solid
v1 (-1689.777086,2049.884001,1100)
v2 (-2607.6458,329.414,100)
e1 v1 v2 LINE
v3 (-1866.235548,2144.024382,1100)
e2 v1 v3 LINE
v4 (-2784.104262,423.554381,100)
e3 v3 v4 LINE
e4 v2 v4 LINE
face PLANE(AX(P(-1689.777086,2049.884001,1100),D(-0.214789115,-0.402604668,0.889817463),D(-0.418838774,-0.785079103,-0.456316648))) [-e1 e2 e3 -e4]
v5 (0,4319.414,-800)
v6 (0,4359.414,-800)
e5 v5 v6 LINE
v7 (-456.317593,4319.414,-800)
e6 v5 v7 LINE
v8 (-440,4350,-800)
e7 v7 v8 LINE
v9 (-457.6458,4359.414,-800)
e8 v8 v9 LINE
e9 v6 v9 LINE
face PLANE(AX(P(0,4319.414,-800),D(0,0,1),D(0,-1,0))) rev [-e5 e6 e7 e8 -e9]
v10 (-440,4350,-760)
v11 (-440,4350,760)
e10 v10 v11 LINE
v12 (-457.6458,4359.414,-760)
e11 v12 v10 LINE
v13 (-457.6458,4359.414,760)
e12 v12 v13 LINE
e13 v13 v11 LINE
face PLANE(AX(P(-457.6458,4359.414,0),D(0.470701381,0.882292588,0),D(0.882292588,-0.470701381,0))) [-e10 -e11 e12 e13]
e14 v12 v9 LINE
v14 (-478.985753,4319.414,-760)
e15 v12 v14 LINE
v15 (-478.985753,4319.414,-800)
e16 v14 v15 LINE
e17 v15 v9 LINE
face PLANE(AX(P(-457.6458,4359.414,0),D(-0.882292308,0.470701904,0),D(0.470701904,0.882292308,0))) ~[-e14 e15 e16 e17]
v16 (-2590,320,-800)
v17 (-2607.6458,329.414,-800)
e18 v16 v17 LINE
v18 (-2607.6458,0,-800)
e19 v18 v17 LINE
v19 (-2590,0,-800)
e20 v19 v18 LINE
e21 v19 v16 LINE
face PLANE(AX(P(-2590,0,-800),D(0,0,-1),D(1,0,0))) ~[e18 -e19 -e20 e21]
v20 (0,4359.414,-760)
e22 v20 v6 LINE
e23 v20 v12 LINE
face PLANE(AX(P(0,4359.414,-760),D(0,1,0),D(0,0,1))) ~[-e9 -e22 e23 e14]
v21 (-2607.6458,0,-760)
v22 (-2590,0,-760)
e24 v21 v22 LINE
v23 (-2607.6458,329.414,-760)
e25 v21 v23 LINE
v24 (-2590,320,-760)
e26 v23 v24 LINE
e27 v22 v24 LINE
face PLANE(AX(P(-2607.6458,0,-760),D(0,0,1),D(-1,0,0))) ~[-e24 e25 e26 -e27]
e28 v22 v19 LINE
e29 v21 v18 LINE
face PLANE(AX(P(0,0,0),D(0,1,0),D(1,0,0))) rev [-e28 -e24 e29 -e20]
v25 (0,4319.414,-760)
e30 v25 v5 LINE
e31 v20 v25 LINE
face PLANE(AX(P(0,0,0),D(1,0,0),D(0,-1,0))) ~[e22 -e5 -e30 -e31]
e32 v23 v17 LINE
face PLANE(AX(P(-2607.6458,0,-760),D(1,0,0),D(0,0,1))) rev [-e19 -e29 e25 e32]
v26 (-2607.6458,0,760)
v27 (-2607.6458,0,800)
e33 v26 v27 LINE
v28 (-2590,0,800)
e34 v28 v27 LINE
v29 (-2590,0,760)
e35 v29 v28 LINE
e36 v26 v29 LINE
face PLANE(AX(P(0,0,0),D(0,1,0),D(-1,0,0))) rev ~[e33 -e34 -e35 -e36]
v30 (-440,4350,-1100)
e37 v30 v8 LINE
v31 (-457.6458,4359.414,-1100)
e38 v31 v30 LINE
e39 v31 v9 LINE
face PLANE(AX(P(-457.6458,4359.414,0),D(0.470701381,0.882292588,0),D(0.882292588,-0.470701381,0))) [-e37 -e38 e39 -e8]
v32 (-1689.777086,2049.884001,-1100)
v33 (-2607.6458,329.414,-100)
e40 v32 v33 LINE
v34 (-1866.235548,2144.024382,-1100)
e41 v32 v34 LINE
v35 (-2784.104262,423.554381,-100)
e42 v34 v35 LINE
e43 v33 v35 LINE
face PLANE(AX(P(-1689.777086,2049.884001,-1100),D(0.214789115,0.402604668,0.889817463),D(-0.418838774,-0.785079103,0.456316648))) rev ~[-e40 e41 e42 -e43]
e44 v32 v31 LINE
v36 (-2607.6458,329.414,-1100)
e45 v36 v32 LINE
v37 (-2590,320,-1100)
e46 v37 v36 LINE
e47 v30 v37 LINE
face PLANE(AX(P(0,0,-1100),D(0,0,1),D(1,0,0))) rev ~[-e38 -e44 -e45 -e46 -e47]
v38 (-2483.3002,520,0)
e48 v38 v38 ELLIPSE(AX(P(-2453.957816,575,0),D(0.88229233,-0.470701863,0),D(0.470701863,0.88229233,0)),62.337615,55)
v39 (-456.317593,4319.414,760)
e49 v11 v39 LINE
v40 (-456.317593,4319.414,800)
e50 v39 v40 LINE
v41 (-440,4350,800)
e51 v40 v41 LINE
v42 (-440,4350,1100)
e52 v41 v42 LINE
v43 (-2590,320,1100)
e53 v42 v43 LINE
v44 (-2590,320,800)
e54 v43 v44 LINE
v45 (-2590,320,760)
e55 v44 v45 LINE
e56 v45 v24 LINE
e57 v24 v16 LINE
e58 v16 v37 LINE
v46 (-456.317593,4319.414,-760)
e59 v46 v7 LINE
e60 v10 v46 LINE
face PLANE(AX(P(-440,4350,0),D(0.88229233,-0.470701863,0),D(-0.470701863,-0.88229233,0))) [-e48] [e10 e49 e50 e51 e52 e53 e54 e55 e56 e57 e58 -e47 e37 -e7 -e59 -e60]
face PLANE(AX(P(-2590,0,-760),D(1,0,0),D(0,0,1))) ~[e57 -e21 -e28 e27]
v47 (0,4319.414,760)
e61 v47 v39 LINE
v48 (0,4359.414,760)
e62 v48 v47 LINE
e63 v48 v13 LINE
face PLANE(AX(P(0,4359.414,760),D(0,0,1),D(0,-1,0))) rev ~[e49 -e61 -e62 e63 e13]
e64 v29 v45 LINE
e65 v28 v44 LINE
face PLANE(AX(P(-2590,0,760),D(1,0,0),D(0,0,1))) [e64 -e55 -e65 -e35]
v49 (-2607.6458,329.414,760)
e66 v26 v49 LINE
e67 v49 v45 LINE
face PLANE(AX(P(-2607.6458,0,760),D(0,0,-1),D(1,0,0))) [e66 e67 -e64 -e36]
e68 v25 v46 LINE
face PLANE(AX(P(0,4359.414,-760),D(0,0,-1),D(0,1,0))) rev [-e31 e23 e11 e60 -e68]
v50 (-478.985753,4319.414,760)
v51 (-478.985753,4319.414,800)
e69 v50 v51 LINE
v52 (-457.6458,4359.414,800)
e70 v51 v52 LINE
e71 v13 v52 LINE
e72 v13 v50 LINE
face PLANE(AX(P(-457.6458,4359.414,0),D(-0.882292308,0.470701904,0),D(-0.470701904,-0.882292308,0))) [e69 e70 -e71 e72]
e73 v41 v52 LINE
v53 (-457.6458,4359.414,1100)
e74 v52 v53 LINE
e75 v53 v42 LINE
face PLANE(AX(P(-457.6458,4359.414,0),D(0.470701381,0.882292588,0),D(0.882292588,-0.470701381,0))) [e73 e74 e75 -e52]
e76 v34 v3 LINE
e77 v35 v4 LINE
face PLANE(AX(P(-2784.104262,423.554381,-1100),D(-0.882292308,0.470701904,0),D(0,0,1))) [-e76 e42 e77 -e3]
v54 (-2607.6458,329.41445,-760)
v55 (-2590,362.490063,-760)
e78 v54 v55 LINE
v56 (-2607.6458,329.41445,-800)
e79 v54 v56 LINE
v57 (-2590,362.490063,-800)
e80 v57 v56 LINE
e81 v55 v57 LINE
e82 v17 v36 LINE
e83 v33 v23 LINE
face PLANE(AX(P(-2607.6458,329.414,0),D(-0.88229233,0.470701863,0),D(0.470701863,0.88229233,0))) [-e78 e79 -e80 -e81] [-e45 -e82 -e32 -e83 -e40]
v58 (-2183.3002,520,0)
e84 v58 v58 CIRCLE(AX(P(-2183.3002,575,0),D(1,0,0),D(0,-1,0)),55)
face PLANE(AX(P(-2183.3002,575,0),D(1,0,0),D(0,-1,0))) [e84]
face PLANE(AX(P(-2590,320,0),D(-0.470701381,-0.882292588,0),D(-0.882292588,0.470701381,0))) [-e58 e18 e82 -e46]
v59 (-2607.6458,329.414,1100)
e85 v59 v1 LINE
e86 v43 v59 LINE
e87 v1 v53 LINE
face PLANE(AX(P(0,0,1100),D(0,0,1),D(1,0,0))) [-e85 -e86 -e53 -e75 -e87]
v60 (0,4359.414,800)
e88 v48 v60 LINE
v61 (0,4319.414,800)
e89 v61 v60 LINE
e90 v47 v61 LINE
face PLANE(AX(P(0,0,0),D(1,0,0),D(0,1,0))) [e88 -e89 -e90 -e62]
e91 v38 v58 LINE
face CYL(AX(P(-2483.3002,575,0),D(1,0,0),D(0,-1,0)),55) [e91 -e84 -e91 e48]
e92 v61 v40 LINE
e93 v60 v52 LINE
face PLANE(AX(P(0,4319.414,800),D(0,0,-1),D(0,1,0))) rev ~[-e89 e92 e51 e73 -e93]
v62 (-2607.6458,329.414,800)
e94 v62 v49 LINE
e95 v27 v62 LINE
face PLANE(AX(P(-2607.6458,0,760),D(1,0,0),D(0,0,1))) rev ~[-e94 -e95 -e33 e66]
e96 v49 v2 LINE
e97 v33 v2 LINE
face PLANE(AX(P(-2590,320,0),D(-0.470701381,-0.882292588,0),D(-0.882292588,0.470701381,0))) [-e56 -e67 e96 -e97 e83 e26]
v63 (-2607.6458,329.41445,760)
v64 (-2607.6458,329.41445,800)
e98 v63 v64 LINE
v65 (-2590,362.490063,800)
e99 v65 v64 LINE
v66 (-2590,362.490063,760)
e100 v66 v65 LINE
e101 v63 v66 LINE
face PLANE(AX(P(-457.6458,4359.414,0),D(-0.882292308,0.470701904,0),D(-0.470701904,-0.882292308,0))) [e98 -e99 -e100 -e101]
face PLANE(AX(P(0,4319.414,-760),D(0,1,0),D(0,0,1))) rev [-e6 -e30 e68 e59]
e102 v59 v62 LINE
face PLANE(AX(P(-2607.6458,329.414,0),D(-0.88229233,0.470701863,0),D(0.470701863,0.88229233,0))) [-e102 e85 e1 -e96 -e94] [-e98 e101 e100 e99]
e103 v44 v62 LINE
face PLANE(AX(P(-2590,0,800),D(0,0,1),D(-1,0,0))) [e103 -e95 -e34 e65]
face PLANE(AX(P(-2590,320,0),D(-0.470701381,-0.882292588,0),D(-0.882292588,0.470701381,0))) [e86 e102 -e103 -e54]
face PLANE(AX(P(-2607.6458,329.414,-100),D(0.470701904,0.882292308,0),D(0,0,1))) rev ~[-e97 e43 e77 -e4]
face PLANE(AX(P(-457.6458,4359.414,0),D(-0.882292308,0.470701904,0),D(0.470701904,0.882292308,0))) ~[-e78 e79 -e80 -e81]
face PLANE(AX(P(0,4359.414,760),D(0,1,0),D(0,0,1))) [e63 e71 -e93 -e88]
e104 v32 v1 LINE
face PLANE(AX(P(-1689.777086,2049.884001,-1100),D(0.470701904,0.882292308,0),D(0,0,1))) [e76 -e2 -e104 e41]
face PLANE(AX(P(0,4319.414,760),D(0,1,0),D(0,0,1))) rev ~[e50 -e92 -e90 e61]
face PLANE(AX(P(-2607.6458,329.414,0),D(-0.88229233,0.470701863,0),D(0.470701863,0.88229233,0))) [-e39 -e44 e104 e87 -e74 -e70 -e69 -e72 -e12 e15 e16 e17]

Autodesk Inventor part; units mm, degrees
ref_plane "YZ Plane" through (0, 0, 0) normal (1, 0, 0) x (0, 1, 0)
ref_plane "XZ Plane" through (0, 0, 0) normal (0, 1, 0) x (-1, 0, 0)
ref_plane "XY Plane" through (0, 0, 0) normal (0, 0, 1) x (1, 0, 0)
sketch "Sketch1" plane through (0, 0, 0) normal (0, 0, 1) x (1, 0, 0)
  line L0 (-440, 0) -> (-440, 4350)
  line L1 (-440, 4350) -> (-2590, 320)
  line L2 (-2590, 320) -> (-2590, 0)
  line L3 (-2590, 0) -> (-440, 0)
  line L4 (-2590, 320) -> (-2607.6458, 329.414)
  line L5 (-2607.6458, 329.414) -> (-457.6458, 4359.414)
  line L6 (-457.6458, 4359.414) -> (-440, 4350)
  point P0 (0, 0)
  dimension "d0" = 4350
  dimension "d1" = 2150
  dimension "d2" = 320
  dimension "d3" = 61.92
  dimension "d4" = 440
  dimension "d5" = 20
extrude "Extrusion1" add sketch "Sketch1" along normal mid plane 2200 contours L1 L4 L5 L6
sketch "Sketch2" plane through (-2607.6458, 329.414, -1100) normal (-0.8822923, 0.4707019, 0) x (0, 0, 1)
  line L0 (0, 0) -> (0, 4567.6471) projected
  line L1 (0, 0) -> (2200, 0) projected
  line L2 (2200, 4567.6471) -> (2200, 0) projected
  line L3 (0, 4567.6471) -> (2200, 4567.6471) projected
  line L4 (0, 1950) -> (1000, 0)
  line L5 (2200, 1950) -> (1200, 0)
  line L6 (0, 1950) -> (2200, 1950)
  point P0 (1100, 936.7843)
  dimension "d8" = 1950
  dimension "d9" = 200
extrude "Extrusion2" add sketch "Sketch2" along normal blind 200 contours L6 L5 L1 L4
sketch "Sketch3" plane through (0, 0, 0) normal (0, 0, 1) x (1, 0, 0)
  line L0 (-2590, 320) -> (-440, 4350) construction
  line L1 (-2483.3002, 575) -> (-2183.3002, 575)
  line L2 (-2483.3002, 575) -> (-2483.3002, 520)
  line L3 (-2483.3002, 520) -> (-2183.3002, 520)
  line L4 (-2183.3002, 520) -> (-2183.3002, 575)
  point P0 (0, 0)
  dimension "d12" = 300
  dimension "d13" = 200
  dimension "d14" = 110
revolve "Revolution1" add sketch "Sketch3" angle 360 about axis through (-2483.3002, 575, 0) along (1, 0, 0)
sketch "Sketch4" plane through (0, 0, 0) normal (0, 1, 0) x (-1, 0, 0)
  line L0 (2607.6458, 100) -> (2607.6458, 1100) projected
  line L1 (2590, -1100) -> (2590, 1100) projected
  line L2 (2590, 800) -> (2607.6458, 800)
  line L3 (2607.6458, 800) -> (2607.6458, 760)
  line L4 (2607.6458, 760) -> (2590, 760)
  line L5 (2590, 760) -> (2590, 800)
  point P0 (0, 0)
  dimension "d16" = 40
  dimension "d17" = 300
extrude "Extrusion3" add sketch "Sketch4" along normal up to surface surface through (-457.6458, 4359.414, 0) normal (-0.8822923, 0.4707019, 0)
sketch "Sketch5" plane through (0, 0, 0) normal (1, 0, 0) x (0, 1, 0)
  line L0 (4359.414, -1100) -> (4359.414, 1100) projected
  line L1 (4359.414, 760) -> (4319.414, 760)
  line L2 (4319.414, 760) -> (4319.414, 800)
  line L3 (4319.414, 800) -> (4359.414, 800)
  line L4 (4359.414, 800) -> (4359.414, 760)
  point P0 (0, 0)
  dimension "d20" = 40
  dimension "d24" = 300
extrude "Extrusion4" add sketch "Sketch5" against normal up to surface surface through (-457.6458, 4359.414, 0) normal (-0.8822923, 0.4707019, 0)
mirror "Mirror2" about plane through (0, 0, 0) normal (0, 0, 1) of "Extrusion3", "Extrusion4"
properties part number "Pocket"
